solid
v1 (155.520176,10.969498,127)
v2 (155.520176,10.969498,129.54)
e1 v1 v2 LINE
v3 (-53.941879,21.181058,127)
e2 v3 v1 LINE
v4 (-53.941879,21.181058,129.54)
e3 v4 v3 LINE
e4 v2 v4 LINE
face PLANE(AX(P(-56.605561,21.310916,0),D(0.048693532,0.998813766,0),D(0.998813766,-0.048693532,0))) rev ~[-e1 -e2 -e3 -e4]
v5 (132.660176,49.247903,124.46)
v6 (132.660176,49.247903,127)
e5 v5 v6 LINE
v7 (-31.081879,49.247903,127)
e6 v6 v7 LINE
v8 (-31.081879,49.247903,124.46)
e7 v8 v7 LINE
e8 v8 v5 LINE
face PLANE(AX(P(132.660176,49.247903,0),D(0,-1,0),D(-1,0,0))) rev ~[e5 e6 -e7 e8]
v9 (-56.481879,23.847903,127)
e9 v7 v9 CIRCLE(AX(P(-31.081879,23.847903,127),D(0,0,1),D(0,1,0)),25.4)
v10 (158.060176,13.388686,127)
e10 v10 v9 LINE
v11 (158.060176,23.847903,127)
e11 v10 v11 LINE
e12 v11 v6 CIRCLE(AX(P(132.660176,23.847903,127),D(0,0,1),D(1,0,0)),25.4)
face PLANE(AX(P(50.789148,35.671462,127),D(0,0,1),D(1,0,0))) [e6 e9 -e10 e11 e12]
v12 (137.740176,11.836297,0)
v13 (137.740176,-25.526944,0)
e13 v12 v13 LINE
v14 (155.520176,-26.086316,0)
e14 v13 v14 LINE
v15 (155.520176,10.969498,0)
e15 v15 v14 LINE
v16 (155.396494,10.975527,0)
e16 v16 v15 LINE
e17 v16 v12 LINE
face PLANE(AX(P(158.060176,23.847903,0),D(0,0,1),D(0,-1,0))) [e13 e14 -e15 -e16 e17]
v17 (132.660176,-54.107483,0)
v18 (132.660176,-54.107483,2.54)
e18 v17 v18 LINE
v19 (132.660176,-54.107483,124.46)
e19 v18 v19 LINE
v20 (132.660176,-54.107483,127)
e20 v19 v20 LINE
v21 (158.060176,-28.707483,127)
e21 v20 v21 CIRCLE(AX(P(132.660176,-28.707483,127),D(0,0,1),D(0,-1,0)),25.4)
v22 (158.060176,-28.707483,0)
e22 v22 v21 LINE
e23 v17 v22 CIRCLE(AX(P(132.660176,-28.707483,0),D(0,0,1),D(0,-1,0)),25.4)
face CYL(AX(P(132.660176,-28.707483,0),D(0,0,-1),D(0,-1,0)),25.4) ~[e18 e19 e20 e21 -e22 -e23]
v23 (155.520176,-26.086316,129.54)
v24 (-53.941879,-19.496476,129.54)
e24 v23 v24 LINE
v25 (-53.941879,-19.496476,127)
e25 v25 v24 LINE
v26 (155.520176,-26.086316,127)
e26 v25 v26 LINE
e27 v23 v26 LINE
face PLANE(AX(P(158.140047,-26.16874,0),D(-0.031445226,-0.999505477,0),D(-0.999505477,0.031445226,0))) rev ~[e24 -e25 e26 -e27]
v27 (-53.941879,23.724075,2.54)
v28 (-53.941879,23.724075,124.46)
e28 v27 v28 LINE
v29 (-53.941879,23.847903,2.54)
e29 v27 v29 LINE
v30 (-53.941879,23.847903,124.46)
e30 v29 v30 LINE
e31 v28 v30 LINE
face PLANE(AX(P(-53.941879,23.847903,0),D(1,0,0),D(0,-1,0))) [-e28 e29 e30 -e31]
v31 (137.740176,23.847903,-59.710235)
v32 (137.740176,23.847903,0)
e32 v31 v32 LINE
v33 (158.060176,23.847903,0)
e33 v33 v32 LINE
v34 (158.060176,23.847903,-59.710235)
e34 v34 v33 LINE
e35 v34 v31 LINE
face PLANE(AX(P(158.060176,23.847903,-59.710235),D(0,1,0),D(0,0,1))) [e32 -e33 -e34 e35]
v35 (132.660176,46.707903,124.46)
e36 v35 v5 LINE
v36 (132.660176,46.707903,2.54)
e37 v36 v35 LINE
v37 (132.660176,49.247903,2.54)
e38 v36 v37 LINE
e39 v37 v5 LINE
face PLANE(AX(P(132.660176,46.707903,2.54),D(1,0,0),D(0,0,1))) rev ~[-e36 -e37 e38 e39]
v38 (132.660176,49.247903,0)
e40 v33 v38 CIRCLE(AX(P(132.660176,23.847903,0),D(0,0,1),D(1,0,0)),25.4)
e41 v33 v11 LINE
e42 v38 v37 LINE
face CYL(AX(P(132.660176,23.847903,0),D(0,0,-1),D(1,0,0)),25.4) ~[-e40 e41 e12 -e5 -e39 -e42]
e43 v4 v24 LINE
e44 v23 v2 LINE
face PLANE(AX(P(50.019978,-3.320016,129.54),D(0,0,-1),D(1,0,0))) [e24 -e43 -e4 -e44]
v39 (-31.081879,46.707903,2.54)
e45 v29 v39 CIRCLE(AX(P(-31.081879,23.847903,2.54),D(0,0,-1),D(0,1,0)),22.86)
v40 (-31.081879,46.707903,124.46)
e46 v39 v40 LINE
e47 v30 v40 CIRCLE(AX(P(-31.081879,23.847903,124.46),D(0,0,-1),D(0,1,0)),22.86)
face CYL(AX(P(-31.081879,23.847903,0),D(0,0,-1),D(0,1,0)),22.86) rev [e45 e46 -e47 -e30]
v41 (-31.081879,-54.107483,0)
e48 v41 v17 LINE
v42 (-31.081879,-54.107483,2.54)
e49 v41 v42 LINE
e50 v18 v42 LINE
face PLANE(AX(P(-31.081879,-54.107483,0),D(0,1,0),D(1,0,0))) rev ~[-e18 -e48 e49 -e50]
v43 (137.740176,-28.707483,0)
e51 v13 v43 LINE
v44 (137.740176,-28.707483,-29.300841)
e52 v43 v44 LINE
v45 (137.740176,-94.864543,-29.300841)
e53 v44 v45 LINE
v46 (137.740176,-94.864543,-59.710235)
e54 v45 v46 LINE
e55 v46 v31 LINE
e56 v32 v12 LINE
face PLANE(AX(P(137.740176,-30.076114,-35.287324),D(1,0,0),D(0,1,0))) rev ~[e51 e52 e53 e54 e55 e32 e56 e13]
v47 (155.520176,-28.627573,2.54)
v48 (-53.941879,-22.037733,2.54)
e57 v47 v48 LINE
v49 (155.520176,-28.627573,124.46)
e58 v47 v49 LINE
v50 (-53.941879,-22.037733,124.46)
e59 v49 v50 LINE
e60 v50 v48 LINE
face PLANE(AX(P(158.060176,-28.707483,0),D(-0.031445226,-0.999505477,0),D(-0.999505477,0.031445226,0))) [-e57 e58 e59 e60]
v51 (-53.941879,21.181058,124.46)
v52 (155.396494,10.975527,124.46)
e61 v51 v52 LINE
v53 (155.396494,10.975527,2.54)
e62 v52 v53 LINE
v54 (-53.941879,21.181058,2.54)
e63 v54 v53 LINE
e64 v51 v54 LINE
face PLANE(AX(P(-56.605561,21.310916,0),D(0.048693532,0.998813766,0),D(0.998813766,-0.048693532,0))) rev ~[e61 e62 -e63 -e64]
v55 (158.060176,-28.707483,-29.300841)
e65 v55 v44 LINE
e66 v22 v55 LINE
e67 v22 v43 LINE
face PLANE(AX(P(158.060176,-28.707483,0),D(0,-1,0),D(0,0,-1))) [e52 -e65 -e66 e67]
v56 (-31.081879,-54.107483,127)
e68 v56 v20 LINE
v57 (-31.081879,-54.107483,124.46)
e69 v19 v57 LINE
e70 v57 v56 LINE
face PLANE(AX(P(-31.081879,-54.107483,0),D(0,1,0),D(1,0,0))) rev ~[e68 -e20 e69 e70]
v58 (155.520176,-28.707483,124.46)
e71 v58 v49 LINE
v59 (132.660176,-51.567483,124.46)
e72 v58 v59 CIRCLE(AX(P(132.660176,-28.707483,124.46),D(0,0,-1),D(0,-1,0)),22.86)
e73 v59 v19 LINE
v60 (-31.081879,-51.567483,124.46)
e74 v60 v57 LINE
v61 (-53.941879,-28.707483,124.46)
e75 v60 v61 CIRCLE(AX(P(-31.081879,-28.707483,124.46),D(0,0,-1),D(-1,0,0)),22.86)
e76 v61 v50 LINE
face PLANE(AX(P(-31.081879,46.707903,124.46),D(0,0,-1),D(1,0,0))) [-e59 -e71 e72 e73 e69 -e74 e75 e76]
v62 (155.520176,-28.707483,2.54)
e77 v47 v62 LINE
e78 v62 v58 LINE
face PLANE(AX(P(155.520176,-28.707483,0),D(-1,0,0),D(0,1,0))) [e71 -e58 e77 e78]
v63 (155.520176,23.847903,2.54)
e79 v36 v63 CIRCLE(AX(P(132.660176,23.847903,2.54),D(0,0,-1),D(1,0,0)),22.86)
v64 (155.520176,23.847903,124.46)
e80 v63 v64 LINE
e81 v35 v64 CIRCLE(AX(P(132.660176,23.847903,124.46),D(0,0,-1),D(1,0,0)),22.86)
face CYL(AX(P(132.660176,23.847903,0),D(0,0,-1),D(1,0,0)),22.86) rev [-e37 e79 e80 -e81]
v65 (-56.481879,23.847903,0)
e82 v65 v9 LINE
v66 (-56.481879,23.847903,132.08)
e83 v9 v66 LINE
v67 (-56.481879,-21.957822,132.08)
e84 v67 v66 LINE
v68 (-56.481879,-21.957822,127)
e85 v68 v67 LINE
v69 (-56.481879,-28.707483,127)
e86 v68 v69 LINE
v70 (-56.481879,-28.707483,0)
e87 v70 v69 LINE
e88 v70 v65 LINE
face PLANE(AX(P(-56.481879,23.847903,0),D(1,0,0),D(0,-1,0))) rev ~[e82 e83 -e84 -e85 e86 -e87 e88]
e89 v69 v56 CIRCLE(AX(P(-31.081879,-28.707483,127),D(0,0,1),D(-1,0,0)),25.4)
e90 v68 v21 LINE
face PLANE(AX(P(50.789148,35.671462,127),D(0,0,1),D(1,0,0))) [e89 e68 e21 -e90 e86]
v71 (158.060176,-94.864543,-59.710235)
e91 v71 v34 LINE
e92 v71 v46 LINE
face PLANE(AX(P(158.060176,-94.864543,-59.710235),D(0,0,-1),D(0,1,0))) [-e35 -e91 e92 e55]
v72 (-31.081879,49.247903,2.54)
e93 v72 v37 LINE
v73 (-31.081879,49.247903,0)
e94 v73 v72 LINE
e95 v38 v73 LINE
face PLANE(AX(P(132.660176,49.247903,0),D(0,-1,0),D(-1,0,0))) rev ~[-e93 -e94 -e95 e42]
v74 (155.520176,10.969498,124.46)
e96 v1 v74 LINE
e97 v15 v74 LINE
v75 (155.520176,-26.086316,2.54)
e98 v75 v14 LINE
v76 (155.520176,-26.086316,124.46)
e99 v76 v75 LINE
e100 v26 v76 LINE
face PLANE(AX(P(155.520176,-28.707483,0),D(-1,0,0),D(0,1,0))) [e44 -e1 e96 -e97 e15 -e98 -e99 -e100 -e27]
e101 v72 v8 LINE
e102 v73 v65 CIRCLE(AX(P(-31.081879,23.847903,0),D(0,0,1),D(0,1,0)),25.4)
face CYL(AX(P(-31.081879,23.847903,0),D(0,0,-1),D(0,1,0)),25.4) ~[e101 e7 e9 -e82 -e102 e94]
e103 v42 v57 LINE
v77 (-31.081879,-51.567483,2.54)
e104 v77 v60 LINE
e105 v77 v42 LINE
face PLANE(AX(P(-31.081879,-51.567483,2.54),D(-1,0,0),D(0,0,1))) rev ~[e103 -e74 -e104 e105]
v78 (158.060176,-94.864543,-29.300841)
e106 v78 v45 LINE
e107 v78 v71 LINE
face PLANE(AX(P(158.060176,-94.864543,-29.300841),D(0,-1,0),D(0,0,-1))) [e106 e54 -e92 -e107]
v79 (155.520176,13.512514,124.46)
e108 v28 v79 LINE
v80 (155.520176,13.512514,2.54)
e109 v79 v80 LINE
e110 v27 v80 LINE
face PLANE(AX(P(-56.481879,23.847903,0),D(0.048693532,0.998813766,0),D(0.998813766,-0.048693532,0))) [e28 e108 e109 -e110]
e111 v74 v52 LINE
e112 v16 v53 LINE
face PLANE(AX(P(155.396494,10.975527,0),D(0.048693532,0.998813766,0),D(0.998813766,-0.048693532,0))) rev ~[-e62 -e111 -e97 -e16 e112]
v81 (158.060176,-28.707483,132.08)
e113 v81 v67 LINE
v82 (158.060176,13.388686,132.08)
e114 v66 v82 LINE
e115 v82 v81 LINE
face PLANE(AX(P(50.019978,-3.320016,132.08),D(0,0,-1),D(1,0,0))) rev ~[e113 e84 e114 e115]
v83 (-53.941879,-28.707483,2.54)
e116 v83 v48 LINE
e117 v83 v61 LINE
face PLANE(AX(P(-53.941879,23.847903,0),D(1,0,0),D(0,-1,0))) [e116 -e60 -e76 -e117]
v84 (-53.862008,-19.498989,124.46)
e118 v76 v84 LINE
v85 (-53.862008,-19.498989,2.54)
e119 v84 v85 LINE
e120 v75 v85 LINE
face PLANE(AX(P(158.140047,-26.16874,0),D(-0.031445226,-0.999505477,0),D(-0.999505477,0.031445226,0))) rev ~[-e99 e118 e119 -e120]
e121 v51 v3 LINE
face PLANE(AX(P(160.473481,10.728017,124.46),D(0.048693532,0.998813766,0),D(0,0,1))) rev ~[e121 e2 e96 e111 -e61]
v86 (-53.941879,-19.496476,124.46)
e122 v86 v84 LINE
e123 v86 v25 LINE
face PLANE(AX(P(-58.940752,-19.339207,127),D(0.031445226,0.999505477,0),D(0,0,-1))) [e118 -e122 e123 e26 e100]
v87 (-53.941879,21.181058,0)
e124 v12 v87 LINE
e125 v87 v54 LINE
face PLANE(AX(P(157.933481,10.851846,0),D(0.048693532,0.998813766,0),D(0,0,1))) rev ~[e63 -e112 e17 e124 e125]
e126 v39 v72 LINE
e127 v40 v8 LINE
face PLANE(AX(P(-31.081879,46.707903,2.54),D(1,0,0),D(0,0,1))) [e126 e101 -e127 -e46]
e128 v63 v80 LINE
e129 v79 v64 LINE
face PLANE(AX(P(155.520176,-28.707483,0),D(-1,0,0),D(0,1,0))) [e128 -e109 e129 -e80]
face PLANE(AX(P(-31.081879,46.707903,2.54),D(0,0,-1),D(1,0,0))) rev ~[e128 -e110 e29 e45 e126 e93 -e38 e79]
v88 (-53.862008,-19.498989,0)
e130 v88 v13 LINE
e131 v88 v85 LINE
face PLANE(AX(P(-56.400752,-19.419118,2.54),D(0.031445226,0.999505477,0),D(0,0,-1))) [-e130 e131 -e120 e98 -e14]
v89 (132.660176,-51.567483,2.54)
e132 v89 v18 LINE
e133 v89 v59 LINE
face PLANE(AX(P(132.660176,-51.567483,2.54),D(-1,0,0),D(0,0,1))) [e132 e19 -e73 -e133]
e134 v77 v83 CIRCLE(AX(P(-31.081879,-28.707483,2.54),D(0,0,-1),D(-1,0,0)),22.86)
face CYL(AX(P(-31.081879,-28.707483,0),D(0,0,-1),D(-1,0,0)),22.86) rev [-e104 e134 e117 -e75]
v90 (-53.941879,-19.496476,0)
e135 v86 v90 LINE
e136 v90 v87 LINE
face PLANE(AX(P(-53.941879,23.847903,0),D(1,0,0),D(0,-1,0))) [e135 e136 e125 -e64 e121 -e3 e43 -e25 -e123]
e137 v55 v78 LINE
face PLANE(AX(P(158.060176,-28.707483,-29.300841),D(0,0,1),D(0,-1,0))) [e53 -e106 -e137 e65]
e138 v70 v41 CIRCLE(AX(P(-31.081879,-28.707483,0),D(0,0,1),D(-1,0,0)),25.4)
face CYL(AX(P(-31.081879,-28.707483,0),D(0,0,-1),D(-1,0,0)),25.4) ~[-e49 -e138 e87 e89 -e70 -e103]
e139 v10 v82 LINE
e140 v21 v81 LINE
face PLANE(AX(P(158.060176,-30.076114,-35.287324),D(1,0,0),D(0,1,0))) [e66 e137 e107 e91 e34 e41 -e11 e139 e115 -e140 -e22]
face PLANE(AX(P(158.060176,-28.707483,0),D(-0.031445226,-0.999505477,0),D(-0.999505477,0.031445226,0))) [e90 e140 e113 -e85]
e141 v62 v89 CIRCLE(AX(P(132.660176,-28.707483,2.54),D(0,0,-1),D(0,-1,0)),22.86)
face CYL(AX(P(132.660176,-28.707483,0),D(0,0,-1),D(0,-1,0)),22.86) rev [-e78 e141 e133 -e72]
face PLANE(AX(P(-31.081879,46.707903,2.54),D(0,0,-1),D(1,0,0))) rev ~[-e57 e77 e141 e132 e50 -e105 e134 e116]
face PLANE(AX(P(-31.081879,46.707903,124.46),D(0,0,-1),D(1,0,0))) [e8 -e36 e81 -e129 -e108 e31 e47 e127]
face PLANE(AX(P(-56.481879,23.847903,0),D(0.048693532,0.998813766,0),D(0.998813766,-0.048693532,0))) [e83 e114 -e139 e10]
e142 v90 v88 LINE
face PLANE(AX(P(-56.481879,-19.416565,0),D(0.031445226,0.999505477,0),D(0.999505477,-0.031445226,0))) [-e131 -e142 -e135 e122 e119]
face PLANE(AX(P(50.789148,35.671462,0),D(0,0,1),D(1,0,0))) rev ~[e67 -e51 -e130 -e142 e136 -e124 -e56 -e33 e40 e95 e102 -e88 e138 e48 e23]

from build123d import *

# Parameters (mm, degrees)
F1_DEPTH     = 127
F2_T         = -2.54
F3_DEPTH     = 25.4
F5_DEPTH     = 132.08
F6_T         = 2.54
F6_T3_DEPTH  = 219.8768545095
F6_T5_DEPTH  = 219.7282038274
F6_T7_DEPTH  = 7.62
F6_T9_DEPTH  = 11.7497509401
F6_T11_DEPTH = 127
F6_T13_DEPTH = 214.6456904056
F6_T15_DEPTH = 5.1599103922
F6_T17_DEPTH = 7.62
F6_T19_DEPTH = 15.4153889552
F6_T21_DEPTH = 214.7908212861
F6_T23_DEPTH = 5.2038284596
F6_T26_ANGLE = 90.000000001
F6_T28_ANGLE = 90.000000001
F6_T30_ANGLE = 90.000000001
F6_T32_ANGLE = 90.000000001
F6_T34_ANGLE = 90.000000001
F6_T36_ANGLE = 90.000000001
F6_T38_ANGLE = 90.000000001
F6_T40_ANGLE = 90.000000001
F8_DEPTH     = 20.32


# Not quite as in the source:
# - a shell that OpenCascade refuses in one call is made with other operations: the cavity is built on its own and cut out


with BuildPart() as f1:
    # F0 (on Top) → F1 (new body)
    with BuildSketch(Plane.XY):
        with BuildLine():
            Line((132.6601760626, 49.2479032969), (-31.0818792045, 49.2479032969))
            ThreePointArc((-31.0818792045, 49.2479032969), (-49.0423914466, 41.8084155391), (-56.4818792045, 23.8479032969))
            Line((-56.4818792045, 23.8479032969), (158.0601760626, 23.8479032969))
            ThreePointArc((158.0601760626, 23.8479032969), (150.6206883047, 41.8084155391), (132.6601760626, 49.2479032969))
        make_face()
        Polygon((158.0601760626, 23.8479032969), (-56.4818792045, 23.8479032969), (-56.4818792045, -2.4297900897), (158.0601760626, -3.4250394454), align=None)
        Polygon((158.0601760626, -3.4250394454), (-56.4818792045, -2.4297900897), (-56.4818792045, -28.7074834764), (158.0601760626, -28.7074834764), align=None)
        with BuildLine():
            Line((158.0601760626, -28.7074834764), (-56.4818792045, -28.7074834764))
            ThreePointArc((-56.4818792045, -28.7074834764), (-49.0423914466, -46.6679957185), (-31.0818792045, -54.1074834764))
            Line((-31.0818792045, -54.1074834764), (132.6601760626, -54.1074834764))
            ThreePointArc((132.6601760626, -54.1074834764), (150.6206883047, -46.6679957185), (158.0601760626, -28.7074834764))
        make_face()
    extrude(amount=F1_DEPTH)

    # F2: a shell. OpenCascade refuses it in one call, so the cavity is built on its own and cut out:
    # the body offset inwards by the wall thickness, plus a prism from it out through each open face.
    f2_core = offset(f1.part, amount=F2_T, mode=Mode.PRIVATE)
    f2_exits = [f2_core.faces().sort_by_distance(p)[0] for p in [
        (50.789148, -51.567483, 63.5),
    ]]
    add(f2_core, mode=Mode.SUBTRACT)
    extrude(f2_exits, amount=-F2_T, mode=Mode.SUBTRACT)

    # F3 (cut): a face of the model
    f3_faces = [f1.faces().sort_by_distance(p)[0] for p in [
        (50.789148429, 46.7079032969, 63.5),
    ]]
    extrude(f3_faces, amount=-F3_DEPTH, mode=Mode.SUBTRACT)

    # F4 (on face) → F5 (join)
    with BuildSketch(Plane(origin=(0, 0, 0), x_dir=(1, 0, 0), z_dir=(0, 0, -1))):
        Polygon((158.0601760626, 28.7074834764), (-56.4818792045, 21.957822144), (-56.4818792045, -23.8479032969), (158.0601760626, -13.3886858821), align=None)
    extrude(amount=-F5_DEPTH)

    # F6: shell of thickness 2.54, made by hand


with BuildPart() as f6_core1:
    # F6_t2: copy of F1
    add(f1.part)

    # the walls: a layer under each face that stays
    f6_faces = [f6_core1.faces().sort_by_distance(p)[0] for p in [
        (-49.0423914466, 41.8084155391, 63.5),
        (50.789148429, 31.3182945895, 127),
        (50.789148429, 18.6182945895, 129.54),
        (50.789148429, -2.4297900897, 132.08),
        (50.789148429, -25.3326528102, 129.54),
        (50.789148429, -38.0326528102, 127),
        (-49.0423914466, -46.6679957185, 63.5),
        (-31.0818792045, -52.8374834764, 63.5),
        (-47.2463402224, -44.8719444943, 63.5),
        (-53.9418792045, -25.3726080063, 63.5),
        (50.789148429, -25.3326528102, 63.5),
        (155.5201760626, -28.6675282803, 63.5),
        (148.8246370805, -44.8719444943, 63.5),
        (132.6601760626, -52.8374834764, 63.5),
        (50.789148429, -38.0726080063, 124.46),
        (50.789148429, -38.0726080063, 2.54),
        (50.789148429, -54.1074834764, 1.27),
        (50.789148429, -54.1074834764, 125.73),
        (150.6206883047, -46.6679957185, 63.5),
        (158.0601760626, -2.4297900897, 66.04),
        (150.6206883047, 41.8084155391, 63.5),
        (132.6601760626, 47.9779032969, 63.5),
        (50.789148429, 31.3802088193, 2.54),
        (-47.2463402224, 40.0123643149, 63.5),
        (-53.9418792045, 23.7859890671, 63.5),
        (50.789148429, 18.6182945895, 63.5),
        (155.5201760626, 18.6802088193, 63.5),
        (50.789148429, 31.3802088193, 124.46),
        (148.8246370805, 40.0123643149, 63.5),
        (-56.4818792045, -2.4297900897, 66.04),
        (50.789148429, 49.2479032969, 125.73),
        (-31.0818792045, 47.9779032969, 63.5),
        (50.789148429, 49.2479032969, 1.27),
    ]]
    thicken(f6_faces, amount=-F6_T, mode=Mode.SUBTRACT)

    # F6_s4 → F6_t3 (cut)
    with BuildSketch(Plane(origin=(159.571223823, -7.779314508, 0), x_dir=(0, 0, 1), z_dir=(-0.9988137664, 0.0486935316, 0))):
        Polygon((127.0254, 21.0947119453), (124.46, 21.0693119453), (124.46, 18.5293119453), (127, 18.5293119453), align=None)
    extrude(amount=F6_T3_DEPTH, mode=Mode.SUBTRACT)

    # F6_s6 → F6_t5 (cut)
    with BuildSketch(Plane(origin=(-58.2746464734, 1.8333660851, 0), x_dir=(0, 0, 1), z_dir=(0.9995054766, -0.0314452262, 0))):
        Polygon((127.0254, 23.7484489574), (127, 21.1830489574), (124.46, 21.1830489574), (124.46, 23.7230489574), align=None)
    extrude(amount=F6_T5_DEPTH, mode=Mode.SUBTRACT)

    # F6_s8 → F6_t7 (cut)
    with BuildSketch(Plane.XZ.offset(49.0274834764)):
        Polygon((-31.0564792045, 2.5654), (-33.6218792045, 2.54), (-33.6218792045, 0), (-31.0818792045, 0), align=None)
        Polygon((-31.0564792045, 124.4346), (-33.6218792045, 124.46), (-33.6218792045, 127), (-31.0818792045, 127), align=None)
        Polygon((132.6347760626, 2.5654), (135.2001760626, 2.54), (135.2001760626, 0), (132.6601760626, 0), align=None)
        Polygon((132.6347760626, 124.4346), (135.2001760626, 124.46), (135.2001760626, 127), (132.6601760626, 127), align=None)
    extrude(amount=F6_T7_DEPTH, mode=Mode.SUBTRACT)

    # F6_s10 → F6_t9 (cut)
    with BuildSketch(Plane.XZ.offset(19.4977325363)):
        Polygon((-53.9164792045, 2.5654), (-56.4818792045, 2.54), (-56.4818792045, 0), (-53.9418792045, 0), align=None)
        Polygon((-53.9164792045, 124.4346), (-56.4818792045, 124.46), (-56.4818792045, 127), (-53.9418792045, 127), align=None)
    extrude(amount=F6_T9_DEPTH, mode=Mode.SUBTRACT)

    # F6_s12 → F6_t11 (cut)
    with BuildSketch(Plane.XY):
        Polygon((-53.9172779133, -22.0631199754), (-56.4818792045, -22.0377325363), (-56.4818792045, -19.4165654331), (-53.8620083299, -19.4989886257), align=None)
        Polygon((155.4939773538, -28.6529605233), (155.6000469372, -26.0888291736), (158.0601760626, -26.1662267655), (158.0601760626, -28.6275730842), align=None)
        Polygon((-53.9152423888, 23.749444707), (-56.4818792045, 23.7240748373), (-56.4818792045, 21.3048866852), (-54.0655607747, 21.1870878706), align=None)
        Polygon((155.4960128783, 13.5378842114), (155.3964944924, 10.975527375), (158.0601760626, 10.8456692704), (158.0601760626, 13.5125143417), align=None)
    extrude(amount=F6_T11_DEPTH, mode=Mode.SUBTRACT)

    # F6_s14 → F6_t13 (cut)
    with BuildSketch(Plane(origin=(-55.7346464734, 1.7534556929, 0), x_dir=(0, 0, 1), z_dir=(0.9995054766, -0.0314452262, 0))):
        Polygon((124.4346, 23.7484489574), (124.46, 21.1830489574), (127, 21.1830489574), (127, 23.7230489574), align=None)
        Polygon((2.5654, 23.7484489574), (2.54, 21.1830489574), (0, 21.1830489574), (0, 23.7230489574), align=None)
    extrude(amount=F6_T13_DEPTH, mode=Mode.SUBTRACT)

    # F6_s16 → F6_t15 (cut)
    with BuildSketch(Plane.XZ.offset(26.0875730842)):
        Polygon((155.4947760626, 124.4346), (158.0601760626, 124.46), (158.0601760626, 127), (155.5201760626, 127), align=None)
        Polygon((155.4947760626, 2.5654), (158.0601760626, 2.54), (158.0601760626, 0), (155.5201760626, 0), align=None)
    extrude(amount=F6_T15_DEPTH, mode=Mode.SUBTRACT)

    # F6_s18 → F6_t17 (cut)
    with BuildSketch(Plane.XZ.offset(-51.7879032969)):
        Polygon((132.6347760626, 124.4346), (135.2001760626, 124.46), (135.2001760626, 127), (132.6601760626, 127), align=None)
        Polygon((132.6347760626, 2.5654), (135.2001760626, 2.54), (135.2001760626, 0), (132.6601760626, 0), align=None)
        Polygon((-31.0564792045, 2.5654), (-31.0818792045, 0), (-33.6218792045, 0), (-33.6218792045, 2.54), align=None)
        Polygon((-31.0564792045, 124.4346), (-31.0818792045, 127), (-33.6218792045, 127), (-33.6218792045, 124.46), align=None)
    extrude(amount=F6_T17_DEPTH, mode=Mode.SUBTRACT)

    # F6_s20 → F6_t19 (cut)
    with BuildSketch(Plane.XZ.offset(-26.3879032969)):
        Polygon((155.4947760626, 2.5654), (155.5201760626, 0), (158.0601760626, 0), (158.0601760626, 2.54), align=None)
        Polygon((155.4947760626, 124.4346), (158.0601760626, 124.46), (158.0601760626, 127), (155.5201760626, 127), align=None)
    extrude(amount=F6_T19_DEPTH, mode=Mode.SUBTRACT)

    # F6_s22 → F6_t21 (cut)
    with BuildSketch(Plane(origin=(157.031223823, -7.6554860484, 0), x_dir=(0, 0, 1), z_dir=(-0.9988137664, 0.0486935316, 0))):
        Polygon((2.5654, 21.0947119453), (0, 21.0693119453), (0, 18.5293119453), (2.54, 18.5293119453), align=None)
        Polygon((124.4346, 21.0947119453), (124.46, 18.5293119453), (127, 18.5293119453), (127, 21.0693119453), align=None)
    extrude(amount=F6_T21_DEPTH, mode=Mode.SUBTRACT)

    # F6_s24 → F6_t23 (cut)
    with BuildSketch(Plane.XZ.offset(-26.3879032969)):
        Polygon((-53.9164792045, 2.5654), (-53.9418792045, 0), (-56.4818792045, 0), (-56.4818792045, 2.54), align=None)
        Polygon((-53.9164792045, 124.4346), (-56.4818792045, 124.46), (-56.4818792045, 127), (-53.9418792045, 127), align=None)
    extrude(amount=F6_T23_DEPTH, mode=Mode.SUBTRACT)

    # F6_s25 → F6_t26 (revolve, cut)
    with BuildSketch(Plane.YZ.offset(-31.0818792045)):
        Polygon((-51.5420834764, 124.4346), (-54.1074834764, 124.46), (-54.1074834764, 127), (-51.5674834764, 127), align=None)
    revolve(axis=Axis((-31.0818792045, -28.7074834764, 124.46), (0, 0, -1)), revolution_arc=F6_T26_ANGLE, mode=Mode.SUBTRACT)

    # F6_s27 → F6_t28 (revolve, cut)
    with BuildSketch(Plane.YZ.offset(-31.0818792045)):
        Polygon((-51.5420834764, 2.5654), (-54.1074834764, 2.54), (-54.1074834764, 0), (-51.5674834764, 0), align=None)
    revolve(axis=Axis((-31.0818792045, -28.7074834764, 2.54), (0, 0, -1)), revolution_arc=F6_T28_ANGLE, mode=Mode.SUBTRACT)

    # F6_s29 → F6_t30 (revolve, cut)
    with BuildSketch(Plane.XZ.offset(28.7074834764)):
        Polygon((155.4947760626, 124.4346), (158.0601760626, 124.46), (158.0601760626, 127), (155.5201760626, 127), align=None)
    revolve(axis=Axis((132.6601760626, -28.7074834764, 124.46), (0, 0, -1)), revolution_arc=F6_T30_ANGLE, mode=Mode.SUBTRACT)

    # F6_s31 → F6_t32 (revolve, cut)
    with BuildSketch(Plane.XZ.offset(28.7074834764)):
        Polygon((155.4947760626, 2.5654), (158.0601760626, 2.54), (158.0601760626, 0), (155.5201760626, 0), align=None)
    revolve(axis=Axis((132.6601760626, -28.7074834764, 2.54), (0, 0, -1)), revolution_arc=F6_T32_ANGLE, mode=Mode.SUBTRACT)

    # F6_s33 → F6_t34 (revolve, cut)
    with BuildSketch(Plane.YZ.offset(132.6601760626)):
        Polygon((46.6825032969, 2.5654), (46.7079032969, 0), (49.2479032969, 0), (49.2479032969, 2.54), align=None)
    revolve(axis=Axis((132.6601760626, 23.8479032969, 2.54), (0, 0, -1)), revolution_arc=F6_T34_ANGLE, mode=Mode.SUBTRACT)

    # F6_s35 → F6_t36 (revolve, cut)
    with BuildSketch(Plane.XZ.offset(-23.8479032969)):
        Polygon((-53.9164792045, 2.5654), (-53.9418792045, 0), (-56.4818792045, 0), (-56.4818792045, 2.54), align=None)
    revolve(axis=Axis((-31.0818792045, 23.8479032969, 2.54), (0, 0, -1)), revolution_arc=F6_T36_ANGLE, mode=Mode.SUBTRACT)

    # F6_s37 → F6_t38 (revolve, cut)
    with BuildSketch(Plane.XZ.offset(-23.8479032969)):
        Polygon((-53.9164792045, 124.4346), (-56.4818792045, 124.46), (-56.4818792045, 127), (-53.9418792045, 127), align=None)
    revolve(axis=Axis((-31.0818792045, 23.8479032969, 124.46), (0, 0, -1)), revolution_arc=F6_T38_ANGLE, mode=Mode.SUBTRACT)

    # F6_s39 → F6_t40 (revolve, cut)
    with BuildSketch(Plane.YZ.offset(132.6601760626)):
        Polygon((46.6825032969, 124.4346), (46.7079032969, 127), (49.2479032969, 127), (49.2479032969, 124.46), align=None)
    revolve(axis=Axis((132.6601760626, 23.8479032969, 124.46), (0, 0, -1)), revolution_arc=F6_T40_ANGLE, mode=Mode.SUBTRACT)


with BuildPart() as f1_1:
    add(f1.part)

    # what is left inside the walls is the cavity
    f6_cavity = [f6_core1.part.solids().sort_by_distance(p)[0] for p in [
        (15.877569, 17.751835, 64.77),
    ]]
    add(f6_cavity, mode=Mode.SUBTRACT)

    # F7 (on face) → F8 (join)
    with BuildSketch(Plane.YZ.offset(158.0601760626)):
        Polygon((23.8479032969, -59.71023524), (23.8479032969, 0), (-28.7074834764, 0), (-28.7074834764, -29.3008414079), (-94.8645432204, -29.3008414079), (-94.8645432204, -59.71023524), align=None)
    extrude(amount=-F8_DEPTH)


solid = f1_1.part
